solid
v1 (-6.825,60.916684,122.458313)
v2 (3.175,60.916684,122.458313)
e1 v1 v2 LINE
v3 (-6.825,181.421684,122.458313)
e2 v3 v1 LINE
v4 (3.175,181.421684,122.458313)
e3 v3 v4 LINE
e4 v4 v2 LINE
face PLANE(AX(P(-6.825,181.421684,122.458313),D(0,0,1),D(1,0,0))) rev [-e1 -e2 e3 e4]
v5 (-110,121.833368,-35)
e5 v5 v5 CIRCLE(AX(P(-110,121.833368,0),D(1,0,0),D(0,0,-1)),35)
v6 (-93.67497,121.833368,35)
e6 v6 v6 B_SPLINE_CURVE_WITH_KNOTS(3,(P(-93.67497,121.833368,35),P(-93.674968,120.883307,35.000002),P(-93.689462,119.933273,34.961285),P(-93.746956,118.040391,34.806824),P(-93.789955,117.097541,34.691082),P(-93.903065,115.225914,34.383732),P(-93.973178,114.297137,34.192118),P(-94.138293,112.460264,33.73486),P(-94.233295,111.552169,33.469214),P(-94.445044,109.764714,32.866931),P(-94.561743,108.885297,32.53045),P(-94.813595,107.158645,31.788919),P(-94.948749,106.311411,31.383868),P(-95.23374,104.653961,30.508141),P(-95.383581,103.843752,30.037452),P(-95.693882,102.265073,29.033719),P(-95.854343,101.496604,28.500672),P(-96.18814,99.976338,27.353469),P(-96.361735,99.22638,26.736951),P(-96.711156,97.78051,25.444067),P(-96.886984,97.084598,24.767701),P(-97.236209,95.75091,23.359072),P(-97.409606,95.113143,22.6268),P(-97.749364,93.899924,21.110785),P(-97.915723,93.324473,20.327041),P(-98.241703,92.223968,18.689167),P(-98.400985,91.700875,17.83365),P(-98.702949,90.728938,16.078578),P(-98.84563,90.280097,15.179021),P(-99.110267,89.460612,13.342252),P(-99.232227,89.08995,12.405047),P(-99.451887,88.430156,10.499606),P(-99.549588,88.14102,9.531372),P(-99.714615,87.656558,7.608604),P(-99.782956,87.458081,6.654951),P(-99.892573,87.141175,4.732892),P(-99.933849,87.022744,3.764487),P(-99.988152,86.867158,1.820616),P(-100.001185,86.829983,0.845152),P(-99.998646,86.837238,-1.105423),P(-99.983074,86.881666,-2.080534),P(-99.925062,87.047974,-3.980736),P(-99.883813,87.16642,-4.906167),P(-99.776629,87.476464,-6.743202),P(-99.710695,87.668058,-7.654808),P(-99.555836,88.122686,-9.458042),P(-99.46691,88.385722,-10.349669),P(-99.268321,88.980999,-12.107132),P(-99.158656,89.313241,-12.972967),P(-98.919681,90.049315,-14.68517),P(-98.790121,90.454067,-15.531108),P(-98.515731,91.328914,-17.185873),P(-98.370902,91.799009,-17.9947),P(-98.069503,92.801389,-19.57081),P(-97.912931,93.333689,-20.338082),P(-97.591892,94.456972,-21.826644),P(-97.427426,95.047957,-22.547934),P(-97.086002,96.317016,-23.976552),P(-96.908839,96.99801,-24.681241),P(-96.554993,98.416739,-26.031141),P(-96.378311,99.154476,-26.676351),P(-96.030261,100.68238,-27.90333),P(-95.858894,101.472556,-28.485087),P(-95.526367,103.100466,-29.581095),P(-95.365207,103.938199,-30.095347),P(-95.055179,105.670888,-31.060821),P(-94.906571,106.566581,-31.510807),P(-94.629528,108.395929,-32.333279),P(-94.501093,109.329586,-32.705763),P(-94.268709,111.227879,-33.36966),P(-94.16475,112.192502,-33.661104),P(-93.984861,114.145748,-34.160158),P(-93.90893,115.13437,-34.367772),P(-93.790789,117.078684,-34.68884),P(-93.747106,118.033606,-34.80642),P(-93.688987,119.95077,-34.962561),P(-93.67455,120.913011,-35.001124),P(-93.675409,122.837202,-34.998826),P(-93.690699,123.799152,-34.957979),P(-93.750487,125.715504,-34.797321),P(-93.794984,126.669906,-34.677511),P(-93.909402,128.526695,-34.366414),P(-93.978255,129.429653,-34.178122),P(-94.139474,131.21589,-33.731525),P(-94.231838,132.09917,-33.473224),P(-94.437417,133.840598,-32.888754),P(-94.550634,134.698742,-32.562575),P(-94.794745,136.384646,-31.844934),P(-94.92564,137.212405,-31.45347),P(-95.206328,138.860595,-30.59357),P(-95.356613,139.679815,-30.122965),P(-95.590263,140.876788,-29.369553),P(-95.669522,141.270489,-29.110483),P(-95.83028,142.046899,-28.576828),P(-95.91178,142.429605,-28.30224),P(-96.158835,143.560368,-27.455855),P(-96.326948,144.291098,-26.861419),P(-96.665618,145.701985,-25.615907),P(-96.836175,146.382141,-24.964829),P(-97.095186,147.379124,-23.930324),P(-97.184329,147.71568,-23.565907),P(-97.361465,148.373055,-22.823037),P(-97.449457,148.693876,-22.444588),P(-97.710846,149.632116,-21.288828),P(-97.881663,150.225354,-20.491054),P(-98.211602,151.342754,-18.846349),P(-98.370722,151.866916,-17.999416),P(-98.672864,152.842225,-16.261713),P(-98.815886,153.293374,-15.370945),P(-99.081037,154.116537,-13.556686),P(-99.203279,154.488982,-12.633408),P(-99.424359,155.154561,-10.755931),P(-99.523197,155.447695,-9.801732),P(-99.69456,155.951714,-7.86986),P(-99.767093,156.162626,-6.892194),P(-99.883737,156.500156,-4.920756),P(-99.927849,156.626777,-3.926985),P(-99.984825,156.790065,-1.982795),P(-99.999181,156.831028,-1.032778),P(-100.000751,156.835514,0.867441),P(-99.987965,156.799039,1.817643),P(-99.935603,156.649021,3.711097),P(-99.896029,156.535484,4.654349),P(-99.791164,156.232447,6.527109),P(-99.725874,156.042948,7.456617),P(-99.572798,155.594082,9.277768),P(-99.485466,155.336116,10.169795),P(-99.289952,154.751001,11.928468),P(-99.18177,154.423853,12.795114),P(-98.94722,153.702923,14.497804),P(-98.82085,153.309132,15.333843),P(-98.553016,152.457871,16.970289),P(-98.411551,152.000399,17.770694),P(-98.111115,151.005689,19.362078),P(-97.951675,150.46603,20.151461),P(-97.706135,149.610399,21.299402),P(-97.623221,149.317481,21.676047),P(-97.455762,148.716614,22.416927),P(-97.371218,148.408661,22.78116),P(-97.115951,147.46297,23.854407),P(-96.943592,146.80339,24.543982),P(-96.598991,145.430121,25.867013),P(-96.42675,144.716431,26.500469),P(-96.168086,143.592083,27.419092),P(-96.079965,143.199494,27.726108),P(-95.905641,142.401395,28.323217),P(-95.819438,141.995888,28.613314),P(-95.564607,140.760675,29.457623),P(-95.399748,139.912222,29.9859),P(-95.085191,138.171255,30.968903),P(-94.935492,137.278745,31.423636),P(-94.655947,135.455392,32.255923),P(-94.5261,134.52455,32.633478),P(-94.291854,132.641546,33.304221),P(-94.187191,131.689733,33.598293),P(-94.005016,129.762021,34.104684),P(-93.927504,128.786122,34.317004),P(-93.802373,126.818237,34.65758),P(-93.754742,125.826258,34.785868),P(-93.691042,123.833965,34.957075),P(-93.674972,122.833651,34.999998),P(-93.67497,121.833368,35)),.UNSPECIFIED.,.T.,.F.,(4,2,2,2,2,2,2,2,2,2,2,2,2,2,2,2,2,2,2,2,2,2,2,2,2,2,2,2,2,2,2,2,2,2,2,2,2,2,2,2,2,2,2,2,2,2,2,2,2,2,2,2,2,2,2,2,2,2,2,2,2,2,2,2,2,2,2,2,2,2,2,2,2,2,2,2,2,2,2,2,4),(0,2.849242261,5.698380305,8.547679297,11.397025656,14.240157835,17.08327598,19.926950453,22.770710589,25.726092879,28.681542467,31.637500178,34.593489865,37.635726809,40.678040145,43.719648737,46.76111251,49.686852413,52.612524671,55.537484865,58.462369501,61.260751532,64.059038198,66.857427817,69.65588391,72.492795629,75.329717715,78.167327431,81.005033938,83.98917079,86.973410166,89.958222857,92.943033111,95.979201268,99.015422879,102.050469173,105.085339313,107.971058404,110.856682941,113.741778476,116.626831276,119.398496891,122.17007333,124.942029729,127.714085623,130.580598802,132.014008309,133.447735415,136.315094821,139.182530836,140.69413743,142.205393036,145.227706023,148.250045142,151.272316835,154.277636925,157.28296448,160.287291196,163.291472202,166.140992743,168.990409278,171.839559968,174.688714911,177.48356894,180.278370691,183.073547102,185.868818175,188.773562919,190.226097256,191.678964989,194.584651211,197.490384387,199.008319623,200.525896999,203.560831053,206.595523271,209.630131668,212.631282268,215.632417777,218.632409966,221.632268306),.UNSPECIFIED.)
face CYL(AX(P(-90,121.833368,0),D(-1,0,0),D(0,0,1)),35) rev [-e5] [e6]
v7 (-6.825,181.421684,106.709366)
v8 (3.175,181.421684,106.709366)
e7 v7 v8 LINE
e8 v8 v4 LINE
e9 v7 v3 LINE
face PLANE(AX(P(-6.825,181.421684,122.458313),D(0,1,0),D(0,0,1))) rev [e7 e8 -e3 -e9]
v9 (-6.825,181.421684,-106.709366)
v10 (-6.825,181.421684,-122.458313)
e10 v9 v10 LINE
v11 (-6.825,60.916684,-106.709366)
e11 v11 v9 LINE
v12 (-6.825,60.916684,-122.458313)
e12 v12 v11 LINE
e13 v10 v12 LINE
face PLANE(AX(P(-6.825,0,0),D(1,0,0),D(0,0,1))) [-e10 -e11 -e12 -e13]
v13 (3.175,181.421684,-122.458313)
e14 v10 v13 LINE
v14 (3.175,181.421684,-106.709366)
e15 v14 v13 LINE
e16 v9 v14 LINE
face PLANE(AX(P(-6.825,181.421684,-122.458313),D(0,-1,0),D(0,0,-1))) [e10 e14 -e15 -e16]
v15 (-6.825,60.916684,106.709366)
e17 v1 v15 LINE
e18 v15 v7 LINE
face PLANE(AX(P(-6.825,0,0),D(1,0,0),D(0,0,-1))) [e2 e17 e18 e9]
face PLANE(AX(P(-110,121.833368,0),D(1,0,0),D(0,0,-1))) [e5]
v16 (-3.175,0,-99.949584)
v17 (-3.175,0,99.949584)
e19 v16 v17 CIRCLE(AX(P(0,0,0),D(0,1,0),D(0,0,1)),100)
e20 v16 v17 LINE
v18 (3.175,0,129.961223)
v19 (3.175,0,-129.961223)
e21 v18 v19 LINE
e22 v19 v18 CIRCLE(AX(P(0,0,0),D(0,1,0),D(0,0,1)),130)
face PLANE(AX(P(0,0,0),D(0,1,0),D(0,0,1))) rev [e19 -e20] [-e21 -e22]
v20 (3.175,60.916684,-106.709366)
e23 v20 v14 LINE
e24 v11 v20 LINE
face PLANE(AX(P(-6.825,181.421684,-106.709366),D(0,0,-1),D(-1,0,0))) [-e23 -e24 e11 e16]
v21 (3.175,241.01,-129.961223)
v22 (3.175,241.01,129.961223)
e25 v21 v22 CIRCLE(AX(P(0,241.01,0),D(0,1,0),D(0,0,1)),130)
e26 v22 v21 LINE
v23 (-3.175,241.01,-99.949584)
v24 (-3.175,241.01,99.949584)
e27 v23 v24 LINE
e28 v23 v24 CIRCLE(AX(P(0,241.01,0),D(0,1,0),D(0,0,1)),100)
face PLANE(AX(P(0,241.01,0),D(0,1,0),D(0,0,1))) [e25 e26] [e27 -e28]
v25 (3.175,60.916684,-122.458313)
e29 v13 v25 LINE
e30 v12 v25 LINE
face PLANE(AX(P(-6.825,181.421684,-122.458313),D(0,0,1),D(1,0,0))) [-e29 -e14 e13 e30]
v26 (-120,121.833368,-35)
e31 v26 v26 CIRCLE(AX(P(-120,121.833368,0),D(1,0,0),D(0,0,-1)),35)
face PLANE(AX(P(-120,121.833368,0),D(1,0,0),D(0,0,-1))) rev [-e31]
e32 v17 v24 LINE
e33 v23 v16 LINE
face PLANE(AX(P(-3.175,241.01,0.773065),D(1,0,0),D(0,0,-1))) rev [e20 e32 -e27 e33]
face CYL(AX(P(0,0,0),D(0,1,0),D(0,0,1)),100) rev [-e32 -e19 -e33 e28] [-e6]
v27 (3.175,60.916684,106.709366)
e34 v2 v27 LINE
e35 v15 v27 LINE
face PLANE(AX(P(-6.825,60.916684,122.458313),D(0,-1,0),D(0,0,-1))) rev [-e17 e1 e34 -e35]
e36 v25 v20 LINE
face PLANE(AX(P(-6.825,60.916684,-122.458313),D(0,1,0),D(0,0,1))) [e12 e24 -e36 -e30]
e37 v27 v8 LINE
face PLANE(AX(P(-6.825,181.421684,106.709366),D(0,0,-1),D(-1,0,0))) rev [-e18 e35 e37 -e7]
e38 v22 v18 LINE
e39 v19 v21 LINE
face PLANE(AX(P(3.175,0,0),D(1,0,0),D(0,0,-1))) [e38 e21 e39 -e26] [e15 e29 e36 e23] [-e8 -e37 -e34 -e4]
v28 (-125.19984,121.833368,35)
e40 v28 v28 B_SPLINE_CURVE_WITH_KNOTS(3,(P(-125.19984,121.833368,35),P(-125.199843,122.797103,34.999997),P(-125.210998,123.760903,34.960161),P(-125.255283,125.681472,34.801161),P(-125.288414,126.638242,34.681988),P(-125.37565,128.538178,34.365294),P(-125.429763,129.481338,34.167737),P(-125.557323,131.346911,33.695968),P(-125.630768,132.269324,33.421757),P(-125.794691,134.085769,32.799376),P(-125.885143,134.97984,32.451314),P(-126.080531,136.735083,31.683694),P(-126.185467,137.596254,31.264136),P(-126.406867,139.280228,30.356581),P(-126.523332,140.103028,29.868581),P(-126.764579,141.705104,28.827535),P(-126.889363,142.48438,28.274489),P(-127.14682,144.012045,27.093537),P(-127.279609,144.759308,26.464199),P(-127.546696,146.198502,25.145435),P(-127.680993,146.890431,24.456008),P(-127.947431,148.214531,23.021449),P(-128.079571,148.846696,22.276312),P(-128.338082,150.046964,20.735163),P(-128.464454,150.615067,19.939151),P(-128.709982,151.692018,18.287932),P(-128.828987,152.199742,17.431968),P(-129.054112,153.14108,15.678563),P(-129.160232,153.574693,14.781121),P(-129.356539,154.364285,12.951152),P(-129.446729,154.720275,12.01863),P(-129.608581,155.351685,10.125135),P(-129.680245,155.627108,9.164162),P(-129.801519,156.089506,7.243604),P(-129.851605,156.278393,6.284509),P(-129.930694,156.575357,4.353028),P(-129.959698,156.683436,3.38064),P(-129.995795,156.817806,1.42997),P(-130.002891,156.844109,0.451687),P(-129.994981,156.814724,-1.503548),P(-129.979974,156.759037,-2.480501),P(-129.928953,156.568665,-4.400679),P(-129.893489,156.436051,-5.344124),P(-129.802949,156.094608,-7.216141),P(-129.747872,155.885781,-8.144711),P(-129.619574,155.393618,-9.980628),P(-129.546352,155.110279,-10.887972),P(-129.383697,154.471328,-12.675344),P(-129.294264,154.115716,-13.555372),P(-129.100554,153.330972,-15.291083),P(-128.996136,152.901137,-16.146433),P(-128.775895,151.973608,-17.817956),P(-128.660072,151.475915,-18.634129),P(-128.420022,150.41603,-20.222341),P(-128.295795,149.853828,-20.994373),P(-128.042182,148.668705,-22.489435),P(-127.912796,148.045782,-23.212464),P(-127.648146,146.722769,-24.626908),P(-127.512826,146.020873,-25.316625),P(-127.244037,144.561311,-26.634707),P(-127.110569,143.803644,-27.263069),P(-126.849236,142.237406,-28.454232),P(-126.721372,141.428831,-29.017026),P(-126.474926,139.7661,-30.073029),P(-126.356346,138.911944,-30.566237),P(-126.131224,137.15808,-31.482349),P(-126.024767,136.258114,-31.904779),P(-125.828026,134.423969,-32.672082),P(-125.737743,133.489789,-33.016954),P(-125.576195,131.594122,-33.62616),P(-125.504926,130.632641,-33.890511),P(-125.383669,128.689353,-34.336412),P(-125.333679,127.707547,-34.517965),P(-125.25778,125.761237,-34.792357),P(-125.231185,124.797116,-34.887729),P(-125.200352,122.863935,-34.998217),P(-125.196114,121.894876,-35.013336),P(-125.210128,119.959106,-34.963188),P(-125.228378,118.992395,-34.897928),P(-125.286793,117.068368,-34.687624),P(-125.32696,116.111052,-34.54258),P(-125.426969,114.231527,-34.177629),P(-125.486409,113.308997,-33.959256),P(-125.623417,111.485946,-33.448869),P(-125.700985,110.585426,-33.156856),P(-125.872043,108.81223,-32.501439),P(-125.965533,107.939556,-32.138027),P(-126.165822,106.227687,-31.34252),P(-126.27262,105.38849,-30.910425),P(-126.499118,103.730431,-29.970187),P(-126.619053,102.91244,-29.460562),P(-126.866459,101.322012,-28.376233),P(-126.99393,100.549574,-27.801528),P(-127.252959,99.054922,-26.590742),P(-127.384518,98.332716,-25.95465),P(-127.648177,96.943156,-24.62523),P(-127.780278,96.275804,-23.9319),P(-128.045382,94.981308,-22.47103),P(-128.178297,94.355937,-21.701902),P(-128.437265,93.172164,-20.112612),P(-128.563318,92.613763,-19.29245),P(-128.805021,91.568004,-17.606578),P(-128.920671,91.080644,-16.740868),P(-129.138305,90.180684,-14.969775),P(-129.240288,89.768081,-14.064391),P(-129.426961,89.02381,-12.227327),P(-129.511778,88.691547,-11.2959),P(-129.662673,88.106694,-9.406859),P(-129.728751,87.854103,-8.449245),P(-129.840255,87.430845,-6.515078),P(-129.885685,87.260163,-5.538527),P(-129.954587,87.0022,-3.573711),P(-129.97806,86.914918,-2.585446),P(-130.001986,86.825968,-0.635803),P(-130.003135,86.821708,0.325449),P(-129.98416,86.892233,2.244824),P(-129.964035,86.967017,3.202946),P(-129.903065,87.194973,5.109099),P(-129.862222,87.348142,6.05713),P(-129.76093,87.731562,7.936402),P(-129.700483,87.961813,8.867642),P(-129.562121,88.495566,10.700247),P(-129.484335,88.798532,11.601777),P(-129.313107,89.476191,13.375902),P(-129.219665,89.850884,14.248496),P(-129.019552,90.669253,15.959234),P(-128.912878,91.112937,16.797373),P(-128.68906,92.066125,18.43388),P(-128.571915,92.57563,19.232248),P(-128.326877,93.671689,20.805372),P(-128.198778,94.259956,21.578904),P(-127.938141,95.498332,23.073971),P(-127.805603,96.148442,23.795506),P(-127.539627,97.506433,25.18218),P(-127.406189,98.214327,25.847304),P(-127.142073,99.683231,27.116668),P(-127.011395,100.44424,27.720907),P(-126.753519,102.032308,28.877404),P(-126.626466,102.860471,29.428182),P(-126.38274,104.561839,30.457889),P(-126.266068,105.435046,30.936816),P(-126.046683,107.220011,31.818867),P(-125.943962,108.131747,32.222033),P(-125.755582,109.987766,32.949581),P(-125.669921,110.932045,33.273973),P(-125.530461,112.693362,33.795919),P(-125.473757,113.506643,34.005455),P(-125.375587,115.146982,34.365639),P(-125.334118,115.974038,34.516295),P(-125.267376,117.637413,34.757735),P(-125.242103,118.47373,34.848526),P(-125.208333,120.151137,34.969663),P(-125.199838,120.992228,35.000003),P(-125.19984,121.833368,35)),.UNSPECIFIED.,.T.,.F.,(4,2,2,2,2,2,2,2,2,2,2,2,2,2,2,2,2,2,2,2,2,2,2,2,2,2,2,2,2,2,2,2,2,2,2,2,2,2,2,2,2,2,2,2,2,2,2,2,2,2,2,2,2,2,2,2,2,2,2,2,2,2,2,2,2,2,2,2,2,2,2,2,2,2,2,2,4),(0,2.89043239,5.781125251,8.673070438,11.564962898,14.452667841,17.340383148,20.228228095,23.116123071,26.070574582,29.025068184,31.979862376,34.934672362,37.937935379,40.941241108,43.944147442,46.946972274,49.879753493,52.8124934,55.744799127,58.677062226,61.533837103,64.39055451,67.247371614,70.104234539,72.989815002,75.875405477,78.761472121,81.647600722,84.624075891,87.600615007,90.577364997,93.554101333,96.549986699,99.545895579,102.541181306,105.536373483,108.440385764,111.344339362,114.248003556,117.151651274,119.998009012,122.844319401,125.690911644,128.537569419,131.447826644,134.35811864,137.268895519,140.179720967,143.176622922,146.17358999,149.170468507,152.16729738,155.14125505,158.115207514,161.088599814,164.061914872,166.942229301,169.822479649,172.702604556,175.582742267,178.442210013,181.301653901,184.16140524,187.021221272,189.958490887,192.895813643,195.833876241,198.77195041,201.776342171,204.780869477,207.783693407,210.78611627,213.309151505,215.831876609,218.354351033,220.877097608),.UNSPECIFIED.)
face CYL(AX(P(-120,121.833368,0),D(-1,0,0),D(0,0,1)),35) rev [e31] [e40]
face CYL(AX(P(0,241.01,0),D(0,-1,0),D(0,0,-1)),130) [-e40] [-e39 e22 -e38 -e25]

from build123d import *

# Parameters (mm, degrees)
SKETCH1_R                = 130
BOSS_EXTRUDE1_DEPTH      = 241.01
SKETCH2_R                = 100
CUT_EXTRUDE1_DEPTH       = 304.126739335
BOSS_EXTRUDE2_DEPTH      = 241.01
BODY_DELETE_KEEP_1_DEPTH = 241.01
SKETCH8_R                = 35
CUT_EXTRUDE2_DEPTH       = 10
CUT_EXTRUDE9_DEPTH       = 10
CUT_EXTRUDE9_DEPTH_BACK  = 10
SKETCH10_R               = 35
SKETCH16_W               = 15.74894652
SKETCH16_H               = 120.505
CUT_EXTRUDE10_DEPTH      = 10


# Read off the part's stored shape, not the designer's step: Body-Delete/Keep 1
with BuildPart() as part:
    # Sketch1 → Boss-Extrude1 (new body)
    with BuildSketch(Plane(origin=(0, 0, 0), x_dir=(1, 0, 0), z_dir=(0, 1, 0))):
        with Locations(Location((0, 0, 0), (0, 0, 270))):
            Circle(SKETCH1_R)
    extrude(amount=BOSS_EXTRUDE1_DEPTH)

    # Sketch2 → Cut-Extrude1 (cut, through all)
    with BuildSketch(Plane(origin=(0, 241.01, 0), x_dir=(1, 0, 0), z_dir=(0, 1, 0))):
        with Locations(Location((0, 0, 0), (0, 0, 270))):
            Circle(SKETCH2_R)
    extrude(amount=-CUT_EXTRUDE1_DEPTH, mode=Mode.SUBTRACT)


with BuildPart() as body_2:
    # Sketch5 → Boss-Extrude2 (new body)
    with BuildSketch(Plane(origin=(0, 0, 0), x_dir=(1, 0, 0), z_dir=(0, 1, 0))):
        Polygon((-3.175, -0.773064833), (-3.175, 104.496382322), (3.175, 104.496382322), (3.175, 0), (3.175, -106.678671161), (-3.175, -106.678671161), align=None)
    extrude(amount=BOSS_EXTRUDE2_DEPTH)


with BuildPart() as body_3:
    # Split1: the piece on the far side of the plane
    add(part.part)
    split(bisect_by=Plane(origin=(3.175, 0, 0), x_dir=(0, 0, 1), z_dir=(1, 0, 0)), keep=Keep.BOTTOM)

    # Combine2: union body 2
    add(body_2.part)

    # Sketch8 → Cut-Extrude2 (cut)
    with BuildSketch(Plane(origin=(-130, 0, 0), x_dir=(0, 0, -1), z_dir=(1, 0, 0))):
        with Locations(Location((0, 121.833368443, 0), (0, 0, 180))):
            Circle(SKETCH8_R)
    extrude(amount=CUT_EXTRUDE2_DEPTH, mode=Mode.SUBTRACT)

    # Sketch10 → Cut-Extrude9 (cut, two sides: drawn at the far end of the back side and taken through both)
    with BuildSketch(Plane(origin=(-100, 0, 0), x_dir=(0, 0, -1), z_dir=(1, 0, 0)).offset(-CUT_EXTRUDE9_DEPTH_BACK)):
        with Locations(Location((0, 121.833368443, 0), (0, 0, 180))):
            Circle(SKETCH10_R)
    extrude(amount=CUT_EXTRUDE9_DEPTH + CUT_EXTRUDE9_DEPTH_BACK, mode=Mode.SUBTRACT)

    # Sketch16 → Cut-Extrude10 (cut)
    with BuildSketch(Plane(origin=(3.175, 0, 0), x_dir=(0, 0, -1), z_dir=(1, 0, 0))):
        with Locations((-114.583839718, 121.169184221)):
            Rectangle(SKETCH16_W, SKETCH16_H)
    cut_extrude10 = extrude(amount=-CUT_EXTRUDE10_DEPTH, mode=Mode.SUBTRACT)

    # Mirror1: Cut-Extrude10 across plane
    add(cut_extrude10.mirror(Plane.XY), mode=Mode.SUBTRACT)


with BuildPart() as part_1:
    add(part.part)

    # Split1
    split(bisect_by=Plane(origin=(3.175, 0, 0), x_dir=(0, 0, 1), z_dir=(1, 0, 0)), keep=Keep.TOP)

    # Body-Delete/Keep 1 outline → Body-Delete/Keep 1 (cut)
    with BuildSketch(Plane(origin=(0, 0, 0), x_dir=(1, 0, 0), z_dir=(0, 1, 0))):
        with BuildLine():
            ThreePointArc((3.175, -129.961222582), (130, 0), (3.175, 129.961222582))
            Line((3.175, 129.961222582), (3.175, 99.949584166))
            ThreePointArc((3.175, 99.949584166), (100, 0), (3.175, -99.949584166))
            Line((3.175, -99.949584166), (3.175, -129.961222582))
        make_face()
    extrude(amount=BODY_DELETE_KEEP_1_DEPTH, mode=Mode.SUBTRACT)


solid = body_3.part
